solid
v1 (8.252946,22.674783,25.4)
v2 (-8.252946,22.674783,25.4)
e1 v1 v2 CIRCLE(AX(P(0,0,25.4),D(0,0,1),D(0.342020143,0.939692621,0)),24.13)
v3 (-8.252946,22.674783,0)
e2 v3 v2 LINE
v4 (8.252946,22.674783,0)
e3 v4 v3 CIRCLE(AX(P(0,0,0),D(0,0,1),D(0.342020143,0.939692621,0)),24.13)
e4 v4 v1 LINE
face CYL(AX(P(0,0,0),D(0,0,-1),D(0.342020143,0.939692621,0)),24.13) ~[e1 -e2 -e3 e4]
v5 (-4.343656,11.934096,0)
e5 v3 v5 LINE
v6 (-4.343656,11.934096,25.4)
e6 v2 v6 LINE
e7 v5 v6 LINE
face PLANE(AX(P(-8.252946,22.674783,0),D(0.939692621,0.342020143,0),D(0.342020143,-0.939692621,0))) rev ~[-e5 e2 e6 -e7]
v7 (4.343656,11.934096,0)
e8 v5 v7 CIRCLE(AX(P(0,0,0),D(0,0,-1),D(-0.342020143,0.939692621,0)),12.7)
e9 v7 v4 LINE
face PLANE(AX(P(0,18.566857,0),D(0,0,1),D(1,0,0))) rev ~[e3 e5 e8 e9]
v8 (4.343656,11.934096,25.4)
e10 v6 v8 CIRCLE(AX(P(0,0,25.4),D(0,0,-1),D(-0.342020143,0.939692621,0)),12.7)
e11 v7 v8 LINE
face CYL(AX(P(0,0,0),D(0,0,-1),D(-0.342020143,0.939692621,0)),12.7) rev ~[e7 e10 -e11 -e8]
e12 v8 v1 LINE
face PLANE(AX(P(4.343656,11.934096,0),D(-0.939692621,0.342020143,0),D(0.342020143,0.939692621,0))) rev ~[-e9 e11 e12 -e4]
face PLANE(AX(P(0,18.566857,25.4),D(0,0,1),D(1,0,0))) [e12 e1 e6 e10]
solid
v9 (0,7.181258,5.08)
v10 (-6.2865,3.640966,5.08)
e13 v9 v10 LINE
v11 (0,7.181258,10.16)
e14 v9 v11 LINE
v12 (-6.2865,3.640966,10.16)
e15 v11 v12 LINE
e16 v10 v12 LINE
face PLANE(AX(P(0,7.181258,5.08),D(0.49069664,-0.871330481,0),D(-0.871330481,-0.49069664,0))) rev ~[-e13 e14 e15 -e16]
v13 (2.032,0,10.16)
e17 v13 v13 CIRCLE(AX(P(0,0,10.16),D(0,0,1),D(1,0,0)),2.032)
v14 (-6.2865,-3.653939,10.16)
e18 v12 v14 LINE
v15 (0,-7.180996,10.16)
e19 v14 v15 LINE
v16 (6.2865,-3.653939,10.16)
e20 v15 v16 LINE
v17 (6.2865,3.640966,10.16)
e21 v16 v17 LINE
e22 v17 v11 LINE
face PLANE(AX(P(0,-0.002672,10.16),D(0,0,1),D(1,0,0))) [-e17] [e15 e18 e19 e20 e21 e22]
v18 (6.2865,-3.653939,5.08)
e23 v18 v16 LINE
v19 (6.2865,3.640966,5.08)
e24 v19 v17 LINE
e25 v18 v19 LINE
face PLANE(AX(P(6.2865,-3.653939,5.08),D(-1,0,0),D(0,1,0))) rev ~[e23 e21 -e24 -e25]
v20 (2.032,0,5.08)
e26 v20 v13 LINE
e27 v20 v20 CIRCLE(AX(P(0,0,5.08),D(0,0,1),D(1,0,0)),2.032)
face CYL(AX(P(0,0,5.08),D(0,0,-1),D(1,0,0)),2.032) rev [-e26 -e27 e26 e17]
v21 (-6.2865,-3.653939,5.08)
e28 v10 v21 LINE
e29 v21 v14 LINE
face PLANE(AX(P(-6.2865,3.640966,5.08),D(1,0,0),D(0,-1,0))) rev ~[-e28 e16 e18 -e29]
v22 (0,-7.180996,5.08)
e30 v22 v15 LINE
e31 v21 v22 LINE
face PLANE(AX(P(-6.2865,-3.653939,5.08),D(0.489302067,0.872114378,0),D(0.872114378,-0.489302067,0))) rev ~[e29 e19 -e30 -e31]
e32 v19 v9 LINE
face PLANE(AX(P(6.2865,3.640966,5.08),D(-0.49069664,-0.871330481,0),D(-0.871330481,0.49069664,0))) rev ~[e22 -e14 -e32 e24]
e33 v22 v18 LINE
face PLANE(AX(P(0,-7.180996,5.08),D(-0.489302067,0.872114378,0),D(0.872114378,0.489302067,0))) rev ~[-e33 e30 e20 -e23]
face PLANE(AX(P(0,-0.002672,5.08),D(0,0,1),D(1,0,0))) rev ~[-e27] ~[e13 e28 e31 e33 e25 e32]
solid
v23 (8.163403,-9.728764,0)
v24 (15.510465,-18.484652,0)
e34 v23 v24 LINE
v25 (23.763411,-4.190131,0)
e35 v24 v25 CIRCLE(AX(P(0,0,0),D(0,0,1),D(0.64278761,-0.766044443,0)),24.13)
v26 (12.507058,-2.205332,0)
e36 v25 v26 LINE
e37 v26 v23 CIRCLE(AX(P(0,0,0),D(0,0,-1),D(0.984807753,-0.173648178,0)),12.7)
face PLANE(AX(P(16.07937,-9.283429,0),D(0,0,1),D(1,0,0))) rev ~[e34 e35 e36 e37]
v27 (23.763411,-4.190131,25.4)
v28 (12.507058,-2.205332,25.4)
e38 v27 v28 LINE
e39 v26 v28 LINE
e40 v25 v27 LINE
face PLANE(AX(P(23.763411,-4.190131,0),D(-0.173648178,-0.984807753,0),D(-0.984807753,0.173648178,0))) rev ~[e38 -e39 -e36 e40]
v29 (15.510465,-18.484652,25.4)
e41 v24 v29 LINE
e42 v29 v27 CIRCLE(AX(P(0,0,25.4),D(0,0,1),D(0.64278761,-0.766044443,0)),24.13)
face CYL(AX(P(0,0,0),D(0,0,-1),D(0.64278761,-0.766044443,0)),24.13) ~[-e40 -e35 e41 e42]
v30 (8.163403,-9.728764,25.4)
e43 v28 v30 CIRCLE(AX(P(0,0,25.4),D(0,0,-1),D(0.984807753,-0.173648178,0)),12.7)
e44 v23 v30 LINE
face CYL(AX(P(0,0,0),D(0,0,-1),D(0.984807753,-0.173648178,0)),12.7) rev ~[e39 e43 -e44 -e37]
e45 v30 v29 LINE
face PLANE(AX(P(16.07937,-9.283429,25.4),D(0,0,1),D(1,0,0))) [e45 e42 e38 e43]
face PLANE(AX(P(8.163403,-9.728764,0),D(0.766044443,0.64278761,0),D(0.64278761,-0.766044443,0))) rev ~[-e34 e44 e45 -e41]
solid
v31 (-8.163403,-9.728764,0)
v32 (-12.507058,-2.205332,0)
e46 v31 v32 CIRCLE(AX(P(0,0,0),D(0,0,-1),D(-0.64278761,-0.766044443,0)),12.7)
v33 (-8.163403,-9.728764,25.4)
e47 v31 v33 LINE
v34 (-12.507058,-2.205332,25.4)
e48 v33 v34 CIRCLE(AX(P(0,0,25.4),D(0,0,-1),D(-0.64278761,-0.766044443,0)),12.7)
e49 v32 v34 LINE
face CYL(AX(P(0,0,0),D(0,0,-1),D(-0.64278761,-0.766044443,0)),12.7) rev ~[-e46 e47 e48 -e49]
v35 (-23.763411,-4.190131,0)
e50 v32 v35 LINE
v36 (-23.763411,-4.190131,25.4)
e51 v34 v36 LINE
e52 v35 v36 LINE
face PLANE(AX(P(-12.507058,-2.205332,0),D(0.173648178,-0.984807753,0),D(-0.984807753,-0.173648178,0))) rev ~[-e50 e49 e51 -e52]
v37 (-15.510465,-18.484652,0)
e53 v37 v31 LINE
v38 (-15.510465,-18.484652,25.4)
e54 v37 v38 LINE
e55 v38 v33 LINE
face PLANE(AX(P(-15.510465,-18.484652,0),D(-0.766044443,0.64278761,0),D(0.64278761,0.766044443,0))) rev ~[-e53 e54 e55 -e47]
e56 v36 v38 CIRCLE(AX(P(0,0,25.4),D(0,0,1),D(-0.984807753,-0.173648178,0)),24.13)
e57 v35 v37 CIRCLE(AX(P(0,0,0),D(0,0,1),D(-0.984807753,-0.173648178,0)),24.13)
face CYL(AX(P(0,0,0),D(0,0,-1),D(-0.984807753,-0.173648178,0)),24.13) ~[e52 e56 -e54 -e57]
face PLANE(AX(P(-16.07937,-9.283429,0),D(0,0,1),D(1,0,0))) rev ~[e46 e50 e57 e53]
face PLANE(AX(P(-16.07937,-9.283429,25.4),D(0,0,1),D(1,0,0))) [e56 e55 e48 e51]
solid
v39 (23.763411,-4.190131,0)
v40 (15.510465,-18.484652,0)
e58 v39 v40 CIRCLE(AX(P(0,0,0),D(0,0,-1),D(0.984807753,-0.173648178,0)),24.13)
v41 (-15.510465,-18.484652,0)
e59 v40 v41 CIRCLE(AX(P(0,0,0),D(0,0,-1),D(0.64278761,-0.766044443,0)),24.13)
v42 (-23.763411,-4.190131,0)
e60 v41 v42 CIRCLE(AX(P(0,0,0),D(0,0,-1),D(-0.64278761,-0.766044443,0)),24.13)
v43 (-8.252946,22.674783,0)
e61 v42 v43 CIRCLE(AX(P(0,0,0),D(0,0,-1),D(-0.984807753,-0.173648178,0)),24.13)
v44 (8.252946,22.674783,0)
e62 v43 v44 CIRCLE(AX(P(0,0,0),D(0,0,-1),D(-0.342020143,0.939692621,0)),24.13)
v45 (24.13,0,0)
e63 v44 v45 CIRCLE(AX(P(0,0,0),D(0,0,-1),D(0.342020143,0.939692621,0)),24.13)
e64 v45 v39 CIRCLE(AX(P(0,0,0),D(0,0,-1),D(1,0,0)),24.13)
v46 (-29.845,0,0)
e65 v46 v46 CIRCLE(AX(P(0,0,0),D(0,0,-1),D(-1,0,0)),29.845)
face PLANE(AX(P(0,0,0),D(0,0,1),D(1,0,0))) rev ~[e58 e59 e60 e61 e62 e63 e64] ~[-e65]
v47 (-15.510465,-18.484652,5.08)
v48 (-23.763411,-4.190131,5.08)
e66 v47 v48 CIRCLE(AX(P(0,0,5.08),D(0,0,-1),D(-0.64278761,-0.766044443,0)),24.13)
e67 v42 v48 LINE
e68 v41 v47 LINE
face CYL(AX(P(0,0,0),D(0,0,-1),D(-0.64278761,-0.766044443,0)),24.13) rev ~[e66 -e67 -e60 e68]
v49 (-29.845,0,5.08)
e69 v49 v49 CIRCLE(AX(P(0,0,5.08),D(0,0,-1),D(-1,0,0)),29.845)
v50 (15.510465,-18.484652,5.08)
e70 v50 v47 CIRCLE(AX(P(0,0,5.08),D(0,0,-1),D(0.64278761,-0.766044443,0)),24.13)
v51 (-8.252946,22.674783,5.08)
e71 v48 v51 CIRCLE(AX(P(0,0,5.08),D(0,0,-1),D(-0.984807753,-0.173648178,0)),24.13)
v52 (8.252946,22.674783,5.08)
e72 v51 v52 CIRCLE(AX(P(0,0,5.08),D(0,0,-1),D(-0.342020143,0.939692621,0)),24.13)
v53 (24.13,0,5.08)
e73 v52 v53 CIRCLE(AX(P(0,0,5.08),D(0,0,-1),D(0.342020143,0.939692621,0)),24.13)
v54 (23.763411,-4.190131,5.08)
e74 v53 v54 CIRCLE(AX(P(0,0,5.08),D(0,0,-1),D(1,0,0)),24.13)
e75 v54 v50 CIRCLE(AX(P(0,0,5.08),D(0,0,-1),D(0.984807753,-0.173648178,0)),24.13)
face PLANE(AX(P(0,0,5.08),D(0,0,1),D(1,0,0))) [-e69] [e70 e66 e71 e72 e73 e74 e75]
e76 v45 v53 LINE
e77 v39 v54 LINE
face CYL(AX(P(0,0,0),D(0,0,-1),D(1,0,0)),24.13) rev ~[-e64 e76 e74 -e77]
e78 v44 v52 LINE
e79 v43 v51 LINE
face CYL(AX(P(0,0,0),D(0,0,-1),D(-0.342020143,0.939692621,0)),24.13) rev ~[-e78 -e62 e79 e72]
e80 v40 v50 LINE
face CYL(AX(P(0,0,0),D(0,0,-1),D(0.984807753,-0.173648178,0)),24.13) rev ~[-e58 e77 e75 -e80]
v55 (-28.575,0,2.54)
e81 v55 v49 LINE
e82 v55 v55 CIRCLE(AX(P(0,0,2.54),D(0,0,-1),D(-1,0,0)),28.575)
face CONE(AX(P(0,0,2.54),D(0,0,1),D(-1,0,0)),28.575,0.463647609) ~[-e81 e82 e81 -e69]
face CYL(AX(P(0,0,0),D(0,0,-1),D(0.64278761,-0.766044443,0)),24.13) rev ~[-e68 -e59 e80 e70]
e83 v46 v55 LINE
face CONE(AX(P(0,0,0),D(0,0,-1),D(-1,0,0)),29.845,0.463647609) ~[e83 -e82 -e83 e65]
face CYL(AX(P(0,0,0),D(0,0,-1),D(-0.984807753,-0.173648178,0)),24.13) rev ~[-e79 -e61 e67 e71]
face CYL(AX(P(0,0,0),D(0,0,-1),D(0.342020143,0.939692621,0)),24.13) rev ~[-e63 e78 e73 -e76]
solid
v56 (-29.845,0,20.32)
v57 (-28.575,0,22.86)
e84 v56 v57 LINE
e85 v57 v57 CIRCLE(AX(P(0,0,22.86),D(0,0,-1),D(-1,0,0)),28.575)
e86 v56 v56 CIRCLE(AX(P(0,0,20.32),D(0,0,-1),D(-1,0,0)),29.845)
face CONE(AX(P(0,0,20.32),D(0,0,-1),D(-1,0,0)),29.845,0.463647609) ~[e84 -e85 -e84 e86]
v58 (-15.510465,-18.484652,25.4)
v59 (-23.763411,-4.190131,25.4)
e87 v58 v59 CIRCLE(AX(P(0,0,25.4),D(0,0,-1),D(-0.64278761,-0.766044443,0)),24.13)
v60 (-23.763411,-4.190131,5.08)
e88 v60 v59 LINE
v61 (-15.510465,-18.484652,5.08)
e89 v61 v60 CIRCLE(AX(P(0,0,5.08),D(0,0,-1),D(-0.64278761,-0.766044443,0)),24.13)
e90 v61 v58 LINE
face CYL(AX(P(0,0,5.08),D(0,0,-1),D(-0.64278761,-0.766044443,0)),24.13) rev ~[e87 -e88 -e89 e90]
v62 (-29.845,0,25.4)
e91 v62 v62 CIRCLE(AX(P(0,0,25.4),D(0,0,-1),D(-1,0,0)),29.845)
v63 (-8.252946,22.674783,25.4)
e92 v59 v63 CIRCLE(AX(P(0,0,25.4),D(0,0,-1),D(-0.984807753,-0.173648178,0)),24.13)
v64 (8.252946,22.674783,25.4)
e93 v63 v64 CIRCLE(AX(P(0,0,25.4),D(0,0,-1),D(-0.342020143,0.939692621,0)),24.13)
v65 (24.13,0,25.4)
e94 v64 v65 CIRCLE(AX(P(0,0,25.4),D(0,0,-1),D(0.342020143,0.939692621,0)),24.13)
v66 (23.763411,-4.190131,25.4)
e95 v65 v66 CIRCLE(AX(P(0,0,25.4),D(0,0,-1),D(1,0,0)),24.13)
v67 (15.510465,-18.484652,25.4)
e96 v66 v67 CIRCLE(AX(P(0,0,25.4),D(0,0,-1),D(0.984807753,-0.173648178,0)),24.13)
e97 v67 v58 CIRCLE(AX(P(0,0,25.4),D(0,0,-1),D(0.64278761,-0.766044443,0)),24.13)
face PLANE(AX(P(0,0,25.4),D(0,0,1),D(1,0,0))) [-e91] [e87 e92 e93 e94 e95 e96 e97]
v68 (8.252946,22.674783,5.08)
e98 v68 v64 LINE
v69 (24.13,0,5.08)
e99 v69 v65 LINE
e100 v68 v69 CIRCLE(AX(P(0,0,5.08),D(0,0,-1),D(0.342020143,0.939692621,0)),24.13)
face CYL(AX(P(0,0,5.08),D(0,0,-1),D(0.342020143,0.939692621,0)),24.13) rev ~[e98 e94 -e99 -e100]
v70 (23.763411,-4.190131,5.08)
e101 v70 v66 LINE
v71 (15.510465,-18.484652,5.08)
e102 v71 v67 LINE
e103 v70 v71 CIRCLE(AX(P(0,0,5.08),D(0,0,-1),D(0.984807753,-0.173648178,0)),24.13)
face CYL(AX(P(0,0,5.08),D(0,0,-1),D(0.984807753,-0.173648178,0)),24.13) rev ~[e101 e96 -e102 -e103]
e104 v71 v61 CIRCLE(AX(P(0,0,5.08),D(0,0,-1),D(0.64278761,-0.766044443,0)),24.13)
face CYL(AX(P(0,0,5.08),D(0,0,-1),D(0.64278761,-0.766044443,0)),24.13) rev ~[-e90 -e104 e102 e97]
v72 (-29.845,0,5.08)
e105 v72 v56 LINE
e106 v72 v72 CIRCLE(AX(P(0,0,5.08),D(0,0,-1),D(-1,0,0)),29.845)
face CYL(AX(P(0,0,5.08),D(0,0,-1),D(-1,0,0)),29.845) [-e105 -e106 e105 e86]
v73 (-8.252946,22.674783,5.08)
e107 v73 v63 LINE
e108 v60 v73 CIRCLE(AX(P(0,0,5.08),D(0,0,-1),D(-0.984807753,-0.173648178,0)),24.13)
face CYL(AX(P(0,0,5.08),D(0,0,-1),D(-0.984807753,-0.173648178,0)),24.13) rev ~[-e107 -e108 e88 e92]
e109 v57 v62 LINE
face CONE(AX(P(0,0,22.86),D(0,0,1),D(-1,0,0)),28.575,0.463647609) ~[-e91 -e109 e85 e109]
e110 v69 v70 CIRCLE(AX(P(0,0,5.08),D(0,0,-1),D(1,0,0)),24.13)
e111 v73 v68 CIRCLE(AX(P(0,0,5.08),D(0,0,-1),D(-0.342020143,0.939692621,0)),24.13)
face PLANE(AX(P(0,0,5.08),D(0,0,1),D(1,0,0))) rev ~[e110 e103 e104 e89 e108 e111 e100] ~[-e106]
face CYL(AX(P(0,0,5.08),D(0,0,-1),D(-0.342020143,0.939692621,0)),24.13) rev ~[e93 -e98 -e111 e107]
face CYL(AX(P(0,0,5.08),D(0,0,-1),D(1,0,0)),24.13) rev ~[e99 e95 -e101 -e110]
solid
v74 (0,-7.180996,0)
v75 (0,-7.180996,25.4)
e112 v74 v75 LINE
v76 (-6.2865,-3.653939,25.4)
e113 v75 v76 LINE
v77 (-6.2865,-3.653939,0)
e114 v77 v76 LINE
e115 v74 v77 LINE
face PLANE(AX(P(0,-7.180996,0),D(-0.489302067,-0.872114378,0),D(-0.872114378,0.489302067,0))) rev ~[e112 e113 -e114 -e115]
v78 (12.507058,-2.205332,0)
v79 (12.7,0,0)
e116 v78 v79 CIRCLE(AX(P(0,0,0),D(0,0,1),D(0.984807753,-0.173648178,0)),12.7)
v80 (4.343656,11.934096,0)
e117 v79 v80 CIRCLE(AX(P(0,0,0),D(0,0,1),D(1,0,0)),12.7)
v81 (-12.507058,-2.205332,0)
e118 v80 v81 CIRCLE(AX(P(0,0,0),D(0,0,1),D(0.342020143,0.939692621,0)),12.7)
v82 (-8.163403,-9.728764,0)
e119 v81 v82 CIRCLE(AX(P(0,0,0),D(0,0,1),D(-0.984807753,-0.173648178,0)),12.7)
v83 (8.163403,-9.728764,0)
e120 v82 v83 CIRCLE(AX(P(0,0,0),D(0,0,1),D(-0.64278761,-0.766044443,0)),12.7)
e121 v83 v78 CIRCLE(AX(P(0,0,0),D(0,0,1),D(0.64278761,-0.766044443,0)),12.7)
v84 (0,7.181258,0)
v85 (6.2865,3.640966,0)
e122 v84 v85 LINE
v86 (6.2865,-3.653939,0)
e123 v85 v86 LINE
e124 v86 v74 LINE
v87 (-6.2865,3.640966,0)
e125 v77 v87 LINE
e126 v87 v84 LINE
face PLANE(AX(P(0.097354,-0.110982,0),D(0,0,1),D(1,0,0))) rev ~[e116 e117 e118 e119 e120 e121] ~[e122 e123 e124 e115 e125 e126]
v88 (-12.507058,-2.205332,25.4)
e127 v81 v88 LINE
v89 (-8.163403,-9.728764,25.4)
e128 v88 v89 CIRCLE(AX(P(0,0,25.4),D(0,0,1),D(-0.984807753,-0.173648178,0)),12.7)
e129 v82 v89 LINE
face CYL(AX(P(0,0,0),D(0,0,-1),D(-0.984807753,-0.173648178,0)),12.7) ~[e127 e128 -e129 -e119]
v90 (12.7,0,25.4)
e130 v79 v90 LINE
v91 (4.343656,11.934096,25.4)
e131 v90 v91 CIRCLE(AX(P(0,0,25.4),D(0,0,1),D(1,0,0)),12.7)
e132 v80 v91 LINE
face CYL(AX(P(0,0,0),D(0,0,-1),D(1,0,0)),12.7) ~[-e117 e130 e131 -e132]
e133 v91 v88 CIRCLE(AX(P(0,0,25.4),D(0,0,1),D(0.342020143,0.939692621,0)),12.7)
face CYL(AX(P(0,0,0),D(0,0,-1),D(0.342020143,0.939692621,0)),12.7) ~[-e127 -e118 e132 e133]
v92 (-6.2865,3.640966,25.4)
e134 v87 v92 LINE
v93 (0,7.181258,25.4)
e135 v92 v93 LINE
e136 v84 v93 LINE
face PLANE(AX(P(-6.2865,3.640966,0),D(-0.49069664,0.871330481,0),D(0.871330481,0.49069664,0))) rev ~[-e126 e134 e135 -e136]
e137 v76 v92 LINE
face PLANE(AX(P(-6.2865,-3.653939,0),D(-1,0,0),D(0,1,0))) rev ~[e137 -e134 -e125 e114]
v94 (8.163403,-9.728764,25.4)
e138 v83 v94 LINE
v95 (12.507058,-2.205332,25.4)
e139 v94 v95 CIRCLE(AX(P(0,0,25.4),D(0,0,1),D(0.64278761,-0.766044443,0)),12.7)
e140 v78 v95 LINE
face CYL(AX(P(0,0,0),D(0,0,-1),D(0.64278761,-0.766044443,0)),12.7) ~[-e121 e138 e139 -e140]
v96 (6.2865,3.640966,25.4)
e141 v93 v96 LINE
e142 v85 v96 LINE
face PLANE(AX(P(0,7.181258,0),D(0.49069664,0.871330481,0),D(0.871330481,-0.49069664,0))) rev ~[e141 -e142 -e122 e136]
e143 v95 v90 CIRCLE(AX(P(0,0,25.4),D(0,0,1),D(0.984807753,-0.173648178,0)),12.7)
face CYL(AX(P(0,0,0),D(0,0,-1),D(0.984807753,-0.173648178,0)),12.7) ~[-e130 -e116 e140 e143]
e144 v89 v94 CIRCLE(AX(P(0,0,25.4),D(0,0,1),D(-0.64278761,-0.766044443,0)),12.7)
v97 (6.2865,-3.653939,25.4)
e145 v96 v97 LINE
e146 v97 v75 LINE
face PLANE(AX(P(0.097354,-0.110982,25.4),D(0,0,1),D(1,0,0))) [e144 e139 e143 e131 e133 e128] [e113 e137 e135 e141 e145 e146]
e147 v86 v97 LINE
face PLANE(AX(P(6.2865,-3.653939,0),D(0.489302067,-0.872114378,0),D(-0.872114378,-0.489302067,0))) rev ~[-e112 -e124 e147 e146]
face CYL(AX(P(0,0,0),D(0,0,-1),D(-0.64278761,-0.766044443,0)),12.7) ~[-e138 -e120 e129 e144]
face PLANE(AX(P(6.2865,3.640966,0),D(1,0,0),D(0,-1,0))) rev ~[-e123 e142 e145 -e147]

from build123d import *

# Parameters (mm, degrees)
F0_R     = 29.845
F0_R_2   = 28.575
F1_DEPTH = 5.08
F4_DEPTH = 25.4
F5_DEPTH = 20.32
F7_DEPTH = 25.4
F0_R_3   = 2.032
F8_DEPTH = 5.08


# Not quite as in the source:
# - a feature names something its author has since deleted; it is built from what else it names


with BuildPart() as f1:
    # F0 (on Top) → F1 (new body)
    with BuildSketch(Plane.XY):
        Circle(F0_R)
        Circle(F0_R_2, mode=Mode.SUBTRACT)
        Circle(F0_R_2)
        with BuildLine():
            ThreePointArc((8.2529460584, 22.6747829396), (19.7661388287, 13.8403994092), (24.13, 0))
            ThreePointArc((24.13, 0), (24.038178065, -2.1030680725), (23.7634110802, -4.1901305271))
            ThreePointArc((23.7634110802, -4.1901305271), (20.8971929933, -12.065), (15.5104650217, -18.4846524125))
            ThreePointArc((15.5104650217, -18.4846524125), (0, -24.13), (-15.5104650217, -18.4846524125))
            ThreePointArc((-15.5104650217, -18.4846524125), (-20.8971929933, -12.065), (-23.7634110802, -4.1901305271))
            ThreePointArc((-23.7634110802, -4.1901305271), (-20.8971929933, 12.065), (-8.2529460584, 22.6747829396))
            ThreePointArc((-8.2529460584, 22.6747829396), (0, 24.13), (8.2529460584, 22.6747829396))
        make_face(mode=Mode.SUBTRACT)
    extrude(amount=F1_DEPTH)

    # F2 (on Front) → F3 (revolve, cut)
    with BuildSketch(Plane.XZ):
        Polygon((-28.575, 2.54), (-29.845, 5.08), (-29.845, 0), align=None)
        Polygon((-28.575, 22.86), (-29.845, 25.4), (-29.845, 20.32), align=None)
    revolve(axis=Axis((0, 0, 0.2129347995), (0, 0, -1)), mode=Mode.SUBTRACT)


with BuildPart() as f4:
    # F0 (on Top) → F4 (new body)
    with BuildSketch(Plane.XY):
        with BuildLine():
            Line((-12.5070584633, -2.2053318564), (-23.7634110802, -4.1901305271))
            ThreePointArc((-23.7634110802, -4.1901305271), (-20.8971929933, -12.065), (-15.5104650217, -18.4846524125))
            Line((-15.5104650217, -18.4846524125), (-8.163402643, -9.7287644276))
            ThreePointArc((-8.163402643, -9.7287644276), (-10.9985226281, -6.35), (-12.5070584633, -2.2053318564))
        make_face()
    extrude(amount=F4_DEPTH)


with BuildPart() as f4b:
    # F0 (on Top) → F4, piece 2 (new body)
    with BuildSketch(Plane.XY):
        with BuildLine():
            Line((4.3436558202, 11.934096284), (8.2529460584, 22.6747829396))
            ThreePointArc((8.2529460584, 22.6747829396), (0, 24.13), (-8.2529460584, 22.6747829396))
            Line((-8.2529460584, 22.6747829396), (-4.3436558202, 11.934096284))
            ThreePointArc((-4.3436558202, 11.934096284), (0, 12.7), (4.3436558202, 11.934096284))
        make_face()
    extrude(amount=F4_DEPTH)


with BuildPart() as f4c:
    # F0 (on Top) → F4, piece 3 (new body)
    with BuildSketch(Plane.XY):
        with BuildLine():
            ThreePointArc((15.5104650217, -18.4846524125), (20.8971929933, -12.065), (23.7634110802, -4.1901305271))
            Line((23.7634110802, -4.1901305271), (12.5070584633, -2.2053318564))
            ThreePointArc((12.5070584633, -2.2053318564), (10.9985226281, -6.35), (8.163402643, -9.7287644276))
            Line((8.163402643, -9.7287644276), (15.5104650217, -18.4846524125))
        make_face()
    extrude(amount=F4_DEPTH)


with BuildPart() as f5:
    # F5 (new, through all): a face of the model
    f5_faces = [f1.part.faces().sort_by_distance(p)[0] for p in [
        (29.0008559246, 0, 5.08),
    ]]
    extrude(f5_faces, amount=F5_DEPTH)

    # F2 (on Front) → F6 (revolve, cut)
    with BuildSketch(Plane.XZ):
        Polygon((-28.575, 22.86), (-29.845, 25.4), (-29.845, 20.32), align=None)
    revolve(axis=Axis((0, 0, 0.2129347995), (0, 0, -1)), mode=Mode.SUBTRACT)


with BuildPart() as f7:
    # F0 (on Top) → F7 (new body)
    with BuildSketch(Plane.XY):
        with BuildLine():
            ThreePointArc((12.7, 0), (10.4032309625, 7.2844207417), (4.3436558202, 11.934096284))
            ThreePointArc((4.3436558202, 11.934096284), (0, 12.7), (-4.3436558202, 11.934096284))
            ThreePointArc((-4.3436558202, 11.934096284), (-10.9985226281, 6.35), (-12.5070584633, -2.2053318564))
            ThreePointArc((-12.5070584633, -2.2053318564), (-10.9985226281, -6.35), (-8.163402643, -9.7287644276))
            ThreePointArc((-8.163402643, -9.7287644276), (0, -12.7), (8.163402643, -9.7287644276))
            ThreePointArc((8.163402643, -9.7287644276), (10.9985226281, -6.35), (12.5070584633, -2.2053318564))
            ThreePointArc((12.5070584633, -2.2053318564), (12.6516726658, -1.1068779329), (12.7, 0))
        make_face()
        Polygon((0, 7.1812582227), (6.2865, 3.6409661174), (6.2865, 0), (6.2865, -3.6539388334), (0, -7.1809962018), (-6.2865, -3.6539388334), (-6.2865, 0), (-6.2865, 3.6409661174), align=None, mode=Mode.SUBTRACT)
    extrude(amount=F7_DEPTH)


with BuildPart() as f8:
    # F0 (on Top) → F8 (new body)
    with BuildSketch(Plane.XY):
        Polygon((6.2865, 0), (6.2865, 3.6409661174), (0, 7.1812582227), (-6.2865, 3.6409661174), (-6.2865, 0), (-6.2865, -3.6539388334), (0, -7.1809962018), (6.2865, -3.6539388334), align=None)
        Circle(F0_R_3, mode=Mode.SUBTRACT)
    extrude(amount=F8_DEPTH)


with BuildPart() as f8_1:
    # F9: moved
    add(f8.part.moved(Location((0, 0, 5.08))))


solid = Compound([f1.part, f4.part, f4b.part, f4c.part, f5.part, f7.part, f8_1.part])
